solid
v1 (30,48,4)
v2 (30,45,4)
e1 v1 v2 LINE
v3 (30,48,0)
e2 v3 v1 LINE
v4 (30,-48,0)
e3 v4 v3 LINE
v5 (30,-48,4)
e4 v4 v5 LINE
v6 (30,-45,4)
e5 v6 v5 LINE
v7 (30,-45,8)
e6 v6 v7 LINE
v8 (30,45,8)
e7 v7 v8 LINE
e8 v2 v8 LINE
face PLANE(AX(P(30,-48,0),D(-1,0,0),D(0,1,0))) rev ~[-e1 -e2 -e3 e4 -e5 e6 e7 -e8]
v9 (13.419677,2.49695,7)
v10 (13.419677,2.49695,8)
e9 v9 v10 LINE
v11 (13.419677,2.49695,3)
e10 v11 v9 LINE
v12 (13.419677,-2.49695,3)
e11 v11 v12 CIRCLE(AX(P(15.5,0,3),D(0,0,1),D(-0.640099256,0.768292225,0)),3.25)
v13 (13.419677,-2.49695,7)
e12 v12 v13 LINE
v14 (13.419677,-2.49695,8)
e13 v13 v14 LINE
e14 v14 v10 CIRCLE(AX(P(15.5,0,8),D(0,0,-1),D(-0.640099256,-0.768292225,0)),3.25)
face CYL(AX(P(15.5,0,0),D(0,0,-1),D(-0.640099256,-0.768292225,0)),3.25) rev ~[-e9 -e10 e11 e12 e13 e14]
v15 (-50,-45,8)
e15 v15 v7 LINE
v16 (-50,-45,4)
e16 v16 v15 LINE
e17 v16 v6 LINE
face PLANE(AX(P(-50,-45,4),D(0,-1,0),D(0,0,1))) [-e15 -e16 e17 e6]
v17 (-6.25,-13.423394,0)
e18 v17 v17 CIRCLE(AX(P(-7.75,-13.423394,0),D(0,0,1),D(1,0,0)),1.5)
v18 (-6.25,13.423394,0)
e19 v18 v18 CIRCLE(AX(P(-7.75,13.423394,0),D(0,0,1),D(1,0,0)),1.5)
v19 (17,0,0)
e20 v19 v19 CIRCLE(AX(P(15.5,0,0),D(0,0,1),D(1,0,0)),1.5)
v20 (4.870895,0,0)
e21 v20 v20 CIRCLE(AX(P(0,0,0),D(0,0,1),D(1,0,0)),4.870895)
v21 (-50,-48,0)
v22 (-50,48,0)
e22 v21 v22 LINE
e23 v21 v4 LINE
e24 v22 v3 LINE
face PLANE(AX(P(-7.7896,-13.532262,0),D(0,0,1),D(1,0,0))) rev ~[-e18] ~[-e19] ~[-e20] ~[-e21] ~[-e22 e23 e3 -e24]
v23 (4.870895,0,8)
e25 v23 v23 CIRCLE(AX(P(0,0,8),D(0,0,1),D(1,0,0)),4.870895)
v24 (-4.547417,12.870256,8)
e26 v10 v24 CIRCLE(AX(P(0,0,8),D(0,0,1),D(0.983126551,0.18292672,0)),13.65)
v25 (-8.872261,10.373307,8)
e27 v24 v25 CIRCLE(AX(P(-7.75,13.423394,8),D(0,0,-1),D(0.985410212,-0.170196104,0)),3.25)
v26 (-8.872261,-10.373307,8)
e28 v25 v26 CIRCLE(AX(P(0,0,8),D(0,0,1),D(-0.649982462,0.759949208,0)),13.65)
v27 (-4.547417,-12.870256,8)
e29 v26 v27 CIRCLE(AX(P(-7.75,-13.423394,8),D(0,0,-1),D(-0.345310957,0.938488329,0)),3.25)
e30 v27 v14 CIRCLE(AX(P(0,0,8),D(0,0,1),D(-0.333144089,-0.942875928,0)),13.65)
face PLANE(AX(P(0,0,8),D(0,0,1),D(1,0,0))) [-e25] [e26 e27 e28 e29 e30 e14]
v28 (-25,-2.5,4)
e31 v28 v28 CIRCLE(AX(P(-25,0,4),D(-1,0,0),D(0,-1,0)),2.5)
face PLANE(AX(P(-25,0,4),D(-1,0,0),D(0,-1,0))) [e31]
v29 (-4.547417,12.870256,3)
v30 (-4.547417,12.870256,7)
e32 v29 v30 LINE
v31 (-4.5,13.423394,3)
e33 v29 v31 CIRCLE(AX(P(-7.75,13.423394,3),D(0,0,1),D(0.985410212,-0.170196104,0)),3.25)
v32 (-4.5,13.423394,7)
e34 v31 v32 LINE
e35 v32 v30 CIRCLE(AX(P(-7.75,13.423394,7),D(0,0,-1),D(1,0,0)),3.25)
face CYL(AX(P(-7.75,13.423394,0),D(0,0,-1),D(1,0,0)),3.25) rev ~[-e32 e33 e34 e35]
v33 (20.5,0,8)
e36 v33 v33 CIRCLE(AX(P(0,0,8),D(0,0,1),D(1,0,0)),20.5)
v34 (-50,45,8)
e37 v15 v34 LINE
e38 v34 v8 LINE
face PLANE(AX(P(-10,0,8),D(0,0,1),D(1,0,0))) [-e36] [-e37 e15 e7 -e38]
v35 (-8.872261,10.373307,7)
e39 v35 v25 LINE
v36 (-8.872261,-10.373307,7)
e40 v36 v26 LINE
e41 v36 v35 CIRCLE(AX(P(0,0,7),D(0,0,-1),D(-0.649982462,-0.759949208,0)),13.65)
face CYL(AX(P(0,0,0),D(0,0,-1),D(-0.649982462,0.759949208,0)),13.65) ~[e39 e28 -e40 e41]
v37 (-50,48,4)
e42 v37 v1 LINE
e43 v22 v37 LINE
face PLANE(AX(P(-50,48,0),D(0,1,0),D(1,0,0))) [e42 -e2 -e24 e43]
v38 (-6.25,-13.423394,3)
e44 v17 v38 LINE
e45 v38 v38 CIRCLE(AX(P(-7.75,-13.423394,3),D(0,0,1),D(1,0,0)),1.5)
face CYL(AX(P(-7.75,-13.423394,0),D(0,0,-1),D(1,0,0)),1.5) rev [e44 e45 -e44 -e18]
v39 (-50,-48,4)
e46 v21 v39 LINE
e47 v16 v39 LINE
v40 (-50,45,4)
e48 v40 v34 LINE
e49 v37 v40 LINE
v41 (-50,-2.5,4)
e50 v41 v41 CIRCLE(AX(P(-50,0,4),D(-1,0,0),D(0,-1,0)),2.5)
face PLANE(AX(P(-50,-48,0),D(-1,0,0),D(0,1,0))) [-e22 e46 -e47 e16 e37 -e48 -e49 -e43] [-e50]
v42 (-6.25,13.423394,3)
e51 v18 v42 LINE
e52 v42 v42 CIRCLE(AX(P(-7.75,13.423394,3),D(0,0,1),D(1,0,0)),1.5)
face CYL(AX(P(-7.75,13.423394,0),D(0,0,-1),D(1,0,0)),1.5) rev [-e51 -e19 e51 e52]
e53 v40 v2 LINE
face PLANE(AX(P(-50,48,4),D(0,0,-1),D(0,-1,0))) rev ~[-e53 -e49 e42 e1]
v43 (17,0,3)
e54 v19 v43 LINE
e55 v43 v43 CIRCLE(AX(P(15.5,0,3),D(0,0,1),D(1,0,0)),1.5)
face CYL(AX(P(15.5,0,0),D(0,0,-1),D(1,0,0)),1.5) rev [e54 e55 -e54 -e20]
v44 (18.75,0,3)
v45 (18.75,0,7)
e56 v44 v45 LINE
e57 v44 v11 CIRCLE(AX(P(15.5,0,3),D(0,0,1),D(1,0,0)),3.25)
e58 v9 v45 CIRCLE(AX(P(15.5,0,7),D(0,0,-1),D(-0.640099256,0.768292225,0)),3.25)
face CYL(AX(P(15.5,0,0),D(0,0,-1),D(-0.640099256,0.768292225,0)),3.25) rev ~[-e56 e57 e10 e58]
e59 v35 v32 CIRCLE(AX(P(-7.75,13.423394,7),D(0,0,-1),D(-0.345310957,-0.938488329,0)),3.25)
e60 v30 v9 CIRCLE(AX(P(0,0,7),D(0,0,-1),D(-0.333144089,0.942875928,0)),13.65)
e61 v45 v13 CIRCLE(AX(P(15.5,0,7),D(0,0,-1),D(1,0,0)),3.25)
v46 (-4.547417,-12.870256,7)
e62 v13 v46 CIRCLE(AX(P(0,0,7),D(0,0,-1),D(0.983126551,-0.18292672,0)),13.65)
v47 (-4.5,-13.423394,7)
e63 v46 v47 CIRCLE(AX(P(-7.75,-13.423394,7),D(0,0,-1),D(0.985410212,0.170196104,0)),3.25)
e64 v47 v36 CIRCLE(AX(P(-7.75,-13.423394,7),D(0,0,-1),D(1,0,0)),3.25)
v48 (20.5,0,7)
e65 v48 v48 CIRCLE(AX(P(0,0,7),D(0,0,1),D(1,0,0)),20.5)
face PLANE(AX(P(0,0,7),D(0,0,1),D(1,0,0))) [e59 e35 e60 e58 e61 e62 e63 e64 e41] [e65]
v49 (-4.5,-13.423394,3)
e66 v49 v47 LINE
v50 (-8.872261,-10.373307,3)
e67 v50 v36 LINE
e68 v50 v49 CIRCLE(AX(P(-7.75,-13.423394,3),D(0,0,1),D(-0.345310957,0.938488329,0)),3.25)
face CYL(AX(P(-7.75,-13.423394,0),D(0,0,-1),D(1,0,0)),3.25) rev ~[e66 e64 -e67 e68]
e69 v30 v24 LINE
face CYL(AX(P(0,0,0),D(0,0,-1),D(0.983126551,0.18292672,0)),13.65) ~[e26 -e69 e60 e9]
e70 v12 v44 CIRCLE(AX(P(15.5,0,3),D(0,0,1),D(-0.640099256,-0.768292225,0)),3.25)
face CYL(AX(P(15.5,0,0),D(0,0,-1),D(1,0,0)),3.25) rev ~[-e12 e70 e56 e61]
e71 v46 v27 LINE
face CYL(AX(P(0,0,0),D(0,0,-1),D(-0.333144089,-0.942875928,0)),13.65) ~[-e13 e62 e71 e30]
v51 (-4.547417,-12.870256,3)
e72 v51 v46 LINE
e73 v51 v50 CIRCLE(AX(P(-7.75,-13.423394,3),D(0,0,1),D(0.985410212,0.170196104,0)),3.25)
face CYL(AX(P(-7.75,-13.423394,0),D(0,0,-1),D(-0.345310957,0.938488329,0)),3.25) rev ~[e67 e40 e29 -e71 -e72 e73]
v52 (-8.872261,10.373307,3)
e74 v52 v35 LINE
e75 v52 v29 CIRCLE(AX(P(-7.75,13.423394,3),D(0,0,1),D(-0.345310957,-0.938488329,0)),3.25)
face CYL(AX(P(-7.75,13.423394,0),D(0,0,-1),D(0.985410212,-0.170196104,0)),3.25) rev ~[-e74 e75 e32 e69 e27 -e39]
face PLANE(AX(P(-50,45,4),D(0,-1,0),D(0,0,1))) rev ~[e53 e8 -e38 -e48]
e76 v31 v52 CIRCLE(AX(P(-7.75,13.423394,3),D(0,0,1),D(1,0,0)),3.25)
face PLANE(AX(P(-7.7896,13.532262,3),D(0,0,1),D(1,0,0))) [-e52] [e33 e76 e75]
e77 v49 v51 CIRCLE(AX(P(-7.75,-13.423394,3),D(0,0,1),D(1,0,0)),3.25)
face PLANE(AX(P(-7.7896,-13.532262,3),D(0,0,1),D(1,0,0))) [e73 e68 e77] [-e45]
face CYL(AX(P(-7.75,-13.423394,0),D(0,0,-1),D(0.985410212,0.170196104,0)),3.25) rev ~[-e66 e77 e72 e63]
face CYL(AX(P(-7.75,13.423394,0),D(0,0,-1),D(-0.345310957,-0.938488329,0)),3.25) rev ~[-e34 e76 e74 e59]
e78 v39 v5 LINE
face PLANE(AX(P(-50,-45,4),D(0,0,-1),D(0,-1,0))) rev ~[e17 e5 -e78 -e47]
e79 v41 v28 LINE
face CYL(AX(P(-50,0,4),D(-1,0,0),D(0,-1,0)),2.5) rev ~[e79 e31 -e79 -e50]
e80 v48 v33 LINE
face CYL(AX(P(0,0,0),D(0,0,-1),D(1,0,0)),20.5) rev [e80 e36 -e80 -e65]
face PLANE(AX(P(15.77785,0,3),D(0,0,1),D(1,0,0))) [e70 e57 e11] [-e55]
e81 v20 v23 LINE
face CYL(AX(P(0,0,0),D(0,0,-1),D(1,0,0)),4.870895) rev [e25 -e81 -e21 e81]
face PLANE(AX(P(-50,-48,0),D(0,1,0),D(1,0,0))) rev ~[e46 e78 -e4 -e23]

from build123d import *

# Parameters (mm, degrees)
F0_W     = 80
F0_H     = 96
F0_R     = 20.5
F1_DEPTH = 8
F0_R_2   = 4.8708945169
F2_DEPTH = 7
F0_R_3   = 1.5
F3_DEPTH = 3
F4_R     = 2.5
F5_DEPTH = 25
F6_W     = 3
F6_H     = 9.6463483796
F6_H_2   = 12.8309304863
F7_DEPTH = 100


# Not quite as in the source:
# - a feature names something its author has since deleted; it is built from what else it names


with BuildPart() as f1:
    # F0 (on Top) → F1 (new body)
    with BuildSketch(Plane.XY):
        with Locations((-10, 0)):
            Rectangle(F0_W, F0_H)
        Circle(F0_R, mode=Mode.SUBTRACT)
    extrude(amount=F1_DEPTH)



with BuildPart() as f1b:
    # F0 (on Top) → F1, piece 2 (new body)
    with BuildSketch(Plane.XY):
        with BuildLine():
            ThreePointArc((13.4196774194, -2.4969497313), (12.25, 0), (13.4196774194, 2.4969497313))
            ThreePointArc((13.4196774194, 2.4969497313), (6.825, 11.8212467617), (-4.5474168104, 12.8702564214))
            ThreePointArc((-4.5474168104, 12.8702564214), (-6.125, 10.6088111964), (-8.8722606089, 10.3733066901))
            ThreePointArc((-8.8722606089, 10.3733066901), (-13.65, 0), (-8.8722606089, -10.3733066901))
            ThreePointArc((-8.8722606089, -10.3733066901), (-6.125, -10.6088111964), (-4.5474168104, -12.8702564214))
            ThreePointArc((-4.5474168104, -12.8702564214), (6.825, -11.8212467617), (13.4196774194, -2.4969497313))
        make_face()
        Circle(F0_R_2, mode=Mode.SUBTRACT)
    extrude(amount=F1_DEPTH)


with BuildPart() as f1_1:
    add(f1.part)

    add(f1b.part)  # F2 merges F1b
    # F0 (on Top) → F2 (join)
    with BuildSketch(Plane.XY):
        Circle(F0_R)
        with BuildLine():
            ThreePointArc((-4.5474168104, 12.8702564214), (6.825, 11.8212467617), (13.4196774194, 2.4969497313))
            ThreePointArc((13.4196774194, 2.4969497313), (16.8786681277, 2.9430892262), (18.75, 0))
            ThreePointArc((18.75, 0), (16.8786681277, -2.9430892262), (13.4196774194, -2.4969497313))
            ThreePointArc((13.4196774194, -2.4969497313), (6.825, -11.8212467617), (-4.5474168104, -12.8702564214))
            ThreePointArc((-4.5474168104, -12.8702564214), (-4.5118759006, -13.1458107676), (-4.5, -13.4233937587))
            ThreePointArc((-4.5, -13.4233937587), (-9.6094559716, -16.0888999938), (-8.8722606089, -10.3733066901))
            ThreePointArc((-8.8722606089, -10.3733066901), (-13.65, 0), (-8.8722606089, 10.3733066901))
            ThreePointArc((-8.8722606089, 10.3733066901), (-9.6094559716, 16.0888999938), (-4.5, 13.4233937587))
            ThreePointArc((-4.5, 13.4233937587), (-4.5118759006, 13.1458107676), (-4.5474168104, 12.8702564214))
        make_face(mode=Mode.SUBTRACT)
    extrude(amount=F2_DEPTH)

    # F0 (on Top) → F3 (join)
    with BuildSketch(Plane.XY):
        with BuildLine():
            ThreePointArc((-4.5, -13.4233937587), (-4.5118759006, -13.1458107676), (-4.5474168104, -12.8702564214))
            ThreePointArc((-4.5474168104, -12.8702564214), (-6.825, -11.8212467617), (-8.8722606089, -10.3733066901))
            ThreePointArc((-8.8722606089, -10.3733066901), (-9.6094559716, -16.0888999938), (-4.5, -13.4233937587))
        make_face()
        with Locations((-7.75, -13.4233937587)):
            Circle(F0_R_3, mode=Mode.SUBTRACT)
        with BuildLine():
            ThreePointArc((-8.8722606089, -10.3733066901), (-6.825, -11.8212467617), (-4.5474168104, -12.8702564214))
            ThreePointArc((-4.5474168104, -12.8702564214), (-6.125, -10.6088111964), (-8.8722606089, -10.3733066901))
        make_face()
        with BuildLine():
            ThreePointArc((13.4196774194, 2.4969497313), (13.5922973918, 1.2537749451), (13.65, 0))
            ThreePointArc((13.65, 0), (13.5922973918, -1.2537749451), (13.4196774194, -2.4969497313))
            ThreePointArc((13.4196774194, -2.4969497313), (16.8786681277, -2.9430892262), (18.75, 0))
            ThreePointArc((18.75, 0), (16.8786681277, 2.9430892262), (13.4196774194, 2.4969497313))
        make_face()
        with Locations((15.5, 0)):
            Circle(F0_R_3, mode=Mode.SUBTRACT)
        with BuildLine():
            ThreePointArc((13.4196774194, -2.4969497313), (13.5922973918, -1.2537749451), (13.65, 0))
            ThreePointArc((13.65, 0), (13.5922973918, 1.2537749451), (13.4196774194, 2.4969497313))
            ThreePointArc((13.4196774194, 2.4969497313), (12.25, 0), (13.4196774194, -2.4969497313))
        make_face()
        with BuildLine():
            ThreePointArc((-8.8722606089, 10.3733066901), (-6.825, 11.8212467617), (-4.5474168104, 12.8702564214))
            ThreePointArc((-4.5474168104, 12.8702564214), (-4.5118759006, 13.1458107676), (-4.5, 13.4233937587))
            ThreePointArc((-4.5, 13.4233937587), (-9.6094559716, 16.0888999938), (-8.8722606089, 10.3733066901))
        make_face()
        with Locations((-7.75, 13.4233937587)):
            Circle(F0_R_3, mode=Mode.SUBTRACT)
        with BuildLine():
            ThreePointArc((-8.8722606089, 10.3733066901), (-6.125, 10.6088111964), (-4.5474168104, 12.8702564214))
            ThreePointArc((-4.5474168104, 12.8702564214), (-6.825, 11.8212467617), (-8.8722606089, 10.3733066901))
        make_face()
    extrude(amount=F3_DEPTH)

    # F4 (on face) → F5 (cut)
    with BuildSketch(Plane(origin=(-50, 0, 0), x_dir=(0, -1, 0), z_dir=(-1, 0, 0))):
        with Locations((0, 4)):
            Circle(F4_R)
    extrude(amount=-F5_DEPTH, mode=Mode.SUBTRACT)

    # F6 (on face) → F7 (cut)
    with BuildSketch(Plane(origin=(-50, 0, 0), x_dir=(0, -1, 0), z_dir=(-1, 0, 0))):
        with Locations((46.5, 8.8231741898)):
            Rectangle(F6_W, F6_H)
        with Locations((-46.5, 10.4154652432)):
            Rectangle(F6_W, F6_H_2)
    extrude(amount=-F7_DEPTH, mode=Mode.SUBTRACT)


solid = f1_1.part
